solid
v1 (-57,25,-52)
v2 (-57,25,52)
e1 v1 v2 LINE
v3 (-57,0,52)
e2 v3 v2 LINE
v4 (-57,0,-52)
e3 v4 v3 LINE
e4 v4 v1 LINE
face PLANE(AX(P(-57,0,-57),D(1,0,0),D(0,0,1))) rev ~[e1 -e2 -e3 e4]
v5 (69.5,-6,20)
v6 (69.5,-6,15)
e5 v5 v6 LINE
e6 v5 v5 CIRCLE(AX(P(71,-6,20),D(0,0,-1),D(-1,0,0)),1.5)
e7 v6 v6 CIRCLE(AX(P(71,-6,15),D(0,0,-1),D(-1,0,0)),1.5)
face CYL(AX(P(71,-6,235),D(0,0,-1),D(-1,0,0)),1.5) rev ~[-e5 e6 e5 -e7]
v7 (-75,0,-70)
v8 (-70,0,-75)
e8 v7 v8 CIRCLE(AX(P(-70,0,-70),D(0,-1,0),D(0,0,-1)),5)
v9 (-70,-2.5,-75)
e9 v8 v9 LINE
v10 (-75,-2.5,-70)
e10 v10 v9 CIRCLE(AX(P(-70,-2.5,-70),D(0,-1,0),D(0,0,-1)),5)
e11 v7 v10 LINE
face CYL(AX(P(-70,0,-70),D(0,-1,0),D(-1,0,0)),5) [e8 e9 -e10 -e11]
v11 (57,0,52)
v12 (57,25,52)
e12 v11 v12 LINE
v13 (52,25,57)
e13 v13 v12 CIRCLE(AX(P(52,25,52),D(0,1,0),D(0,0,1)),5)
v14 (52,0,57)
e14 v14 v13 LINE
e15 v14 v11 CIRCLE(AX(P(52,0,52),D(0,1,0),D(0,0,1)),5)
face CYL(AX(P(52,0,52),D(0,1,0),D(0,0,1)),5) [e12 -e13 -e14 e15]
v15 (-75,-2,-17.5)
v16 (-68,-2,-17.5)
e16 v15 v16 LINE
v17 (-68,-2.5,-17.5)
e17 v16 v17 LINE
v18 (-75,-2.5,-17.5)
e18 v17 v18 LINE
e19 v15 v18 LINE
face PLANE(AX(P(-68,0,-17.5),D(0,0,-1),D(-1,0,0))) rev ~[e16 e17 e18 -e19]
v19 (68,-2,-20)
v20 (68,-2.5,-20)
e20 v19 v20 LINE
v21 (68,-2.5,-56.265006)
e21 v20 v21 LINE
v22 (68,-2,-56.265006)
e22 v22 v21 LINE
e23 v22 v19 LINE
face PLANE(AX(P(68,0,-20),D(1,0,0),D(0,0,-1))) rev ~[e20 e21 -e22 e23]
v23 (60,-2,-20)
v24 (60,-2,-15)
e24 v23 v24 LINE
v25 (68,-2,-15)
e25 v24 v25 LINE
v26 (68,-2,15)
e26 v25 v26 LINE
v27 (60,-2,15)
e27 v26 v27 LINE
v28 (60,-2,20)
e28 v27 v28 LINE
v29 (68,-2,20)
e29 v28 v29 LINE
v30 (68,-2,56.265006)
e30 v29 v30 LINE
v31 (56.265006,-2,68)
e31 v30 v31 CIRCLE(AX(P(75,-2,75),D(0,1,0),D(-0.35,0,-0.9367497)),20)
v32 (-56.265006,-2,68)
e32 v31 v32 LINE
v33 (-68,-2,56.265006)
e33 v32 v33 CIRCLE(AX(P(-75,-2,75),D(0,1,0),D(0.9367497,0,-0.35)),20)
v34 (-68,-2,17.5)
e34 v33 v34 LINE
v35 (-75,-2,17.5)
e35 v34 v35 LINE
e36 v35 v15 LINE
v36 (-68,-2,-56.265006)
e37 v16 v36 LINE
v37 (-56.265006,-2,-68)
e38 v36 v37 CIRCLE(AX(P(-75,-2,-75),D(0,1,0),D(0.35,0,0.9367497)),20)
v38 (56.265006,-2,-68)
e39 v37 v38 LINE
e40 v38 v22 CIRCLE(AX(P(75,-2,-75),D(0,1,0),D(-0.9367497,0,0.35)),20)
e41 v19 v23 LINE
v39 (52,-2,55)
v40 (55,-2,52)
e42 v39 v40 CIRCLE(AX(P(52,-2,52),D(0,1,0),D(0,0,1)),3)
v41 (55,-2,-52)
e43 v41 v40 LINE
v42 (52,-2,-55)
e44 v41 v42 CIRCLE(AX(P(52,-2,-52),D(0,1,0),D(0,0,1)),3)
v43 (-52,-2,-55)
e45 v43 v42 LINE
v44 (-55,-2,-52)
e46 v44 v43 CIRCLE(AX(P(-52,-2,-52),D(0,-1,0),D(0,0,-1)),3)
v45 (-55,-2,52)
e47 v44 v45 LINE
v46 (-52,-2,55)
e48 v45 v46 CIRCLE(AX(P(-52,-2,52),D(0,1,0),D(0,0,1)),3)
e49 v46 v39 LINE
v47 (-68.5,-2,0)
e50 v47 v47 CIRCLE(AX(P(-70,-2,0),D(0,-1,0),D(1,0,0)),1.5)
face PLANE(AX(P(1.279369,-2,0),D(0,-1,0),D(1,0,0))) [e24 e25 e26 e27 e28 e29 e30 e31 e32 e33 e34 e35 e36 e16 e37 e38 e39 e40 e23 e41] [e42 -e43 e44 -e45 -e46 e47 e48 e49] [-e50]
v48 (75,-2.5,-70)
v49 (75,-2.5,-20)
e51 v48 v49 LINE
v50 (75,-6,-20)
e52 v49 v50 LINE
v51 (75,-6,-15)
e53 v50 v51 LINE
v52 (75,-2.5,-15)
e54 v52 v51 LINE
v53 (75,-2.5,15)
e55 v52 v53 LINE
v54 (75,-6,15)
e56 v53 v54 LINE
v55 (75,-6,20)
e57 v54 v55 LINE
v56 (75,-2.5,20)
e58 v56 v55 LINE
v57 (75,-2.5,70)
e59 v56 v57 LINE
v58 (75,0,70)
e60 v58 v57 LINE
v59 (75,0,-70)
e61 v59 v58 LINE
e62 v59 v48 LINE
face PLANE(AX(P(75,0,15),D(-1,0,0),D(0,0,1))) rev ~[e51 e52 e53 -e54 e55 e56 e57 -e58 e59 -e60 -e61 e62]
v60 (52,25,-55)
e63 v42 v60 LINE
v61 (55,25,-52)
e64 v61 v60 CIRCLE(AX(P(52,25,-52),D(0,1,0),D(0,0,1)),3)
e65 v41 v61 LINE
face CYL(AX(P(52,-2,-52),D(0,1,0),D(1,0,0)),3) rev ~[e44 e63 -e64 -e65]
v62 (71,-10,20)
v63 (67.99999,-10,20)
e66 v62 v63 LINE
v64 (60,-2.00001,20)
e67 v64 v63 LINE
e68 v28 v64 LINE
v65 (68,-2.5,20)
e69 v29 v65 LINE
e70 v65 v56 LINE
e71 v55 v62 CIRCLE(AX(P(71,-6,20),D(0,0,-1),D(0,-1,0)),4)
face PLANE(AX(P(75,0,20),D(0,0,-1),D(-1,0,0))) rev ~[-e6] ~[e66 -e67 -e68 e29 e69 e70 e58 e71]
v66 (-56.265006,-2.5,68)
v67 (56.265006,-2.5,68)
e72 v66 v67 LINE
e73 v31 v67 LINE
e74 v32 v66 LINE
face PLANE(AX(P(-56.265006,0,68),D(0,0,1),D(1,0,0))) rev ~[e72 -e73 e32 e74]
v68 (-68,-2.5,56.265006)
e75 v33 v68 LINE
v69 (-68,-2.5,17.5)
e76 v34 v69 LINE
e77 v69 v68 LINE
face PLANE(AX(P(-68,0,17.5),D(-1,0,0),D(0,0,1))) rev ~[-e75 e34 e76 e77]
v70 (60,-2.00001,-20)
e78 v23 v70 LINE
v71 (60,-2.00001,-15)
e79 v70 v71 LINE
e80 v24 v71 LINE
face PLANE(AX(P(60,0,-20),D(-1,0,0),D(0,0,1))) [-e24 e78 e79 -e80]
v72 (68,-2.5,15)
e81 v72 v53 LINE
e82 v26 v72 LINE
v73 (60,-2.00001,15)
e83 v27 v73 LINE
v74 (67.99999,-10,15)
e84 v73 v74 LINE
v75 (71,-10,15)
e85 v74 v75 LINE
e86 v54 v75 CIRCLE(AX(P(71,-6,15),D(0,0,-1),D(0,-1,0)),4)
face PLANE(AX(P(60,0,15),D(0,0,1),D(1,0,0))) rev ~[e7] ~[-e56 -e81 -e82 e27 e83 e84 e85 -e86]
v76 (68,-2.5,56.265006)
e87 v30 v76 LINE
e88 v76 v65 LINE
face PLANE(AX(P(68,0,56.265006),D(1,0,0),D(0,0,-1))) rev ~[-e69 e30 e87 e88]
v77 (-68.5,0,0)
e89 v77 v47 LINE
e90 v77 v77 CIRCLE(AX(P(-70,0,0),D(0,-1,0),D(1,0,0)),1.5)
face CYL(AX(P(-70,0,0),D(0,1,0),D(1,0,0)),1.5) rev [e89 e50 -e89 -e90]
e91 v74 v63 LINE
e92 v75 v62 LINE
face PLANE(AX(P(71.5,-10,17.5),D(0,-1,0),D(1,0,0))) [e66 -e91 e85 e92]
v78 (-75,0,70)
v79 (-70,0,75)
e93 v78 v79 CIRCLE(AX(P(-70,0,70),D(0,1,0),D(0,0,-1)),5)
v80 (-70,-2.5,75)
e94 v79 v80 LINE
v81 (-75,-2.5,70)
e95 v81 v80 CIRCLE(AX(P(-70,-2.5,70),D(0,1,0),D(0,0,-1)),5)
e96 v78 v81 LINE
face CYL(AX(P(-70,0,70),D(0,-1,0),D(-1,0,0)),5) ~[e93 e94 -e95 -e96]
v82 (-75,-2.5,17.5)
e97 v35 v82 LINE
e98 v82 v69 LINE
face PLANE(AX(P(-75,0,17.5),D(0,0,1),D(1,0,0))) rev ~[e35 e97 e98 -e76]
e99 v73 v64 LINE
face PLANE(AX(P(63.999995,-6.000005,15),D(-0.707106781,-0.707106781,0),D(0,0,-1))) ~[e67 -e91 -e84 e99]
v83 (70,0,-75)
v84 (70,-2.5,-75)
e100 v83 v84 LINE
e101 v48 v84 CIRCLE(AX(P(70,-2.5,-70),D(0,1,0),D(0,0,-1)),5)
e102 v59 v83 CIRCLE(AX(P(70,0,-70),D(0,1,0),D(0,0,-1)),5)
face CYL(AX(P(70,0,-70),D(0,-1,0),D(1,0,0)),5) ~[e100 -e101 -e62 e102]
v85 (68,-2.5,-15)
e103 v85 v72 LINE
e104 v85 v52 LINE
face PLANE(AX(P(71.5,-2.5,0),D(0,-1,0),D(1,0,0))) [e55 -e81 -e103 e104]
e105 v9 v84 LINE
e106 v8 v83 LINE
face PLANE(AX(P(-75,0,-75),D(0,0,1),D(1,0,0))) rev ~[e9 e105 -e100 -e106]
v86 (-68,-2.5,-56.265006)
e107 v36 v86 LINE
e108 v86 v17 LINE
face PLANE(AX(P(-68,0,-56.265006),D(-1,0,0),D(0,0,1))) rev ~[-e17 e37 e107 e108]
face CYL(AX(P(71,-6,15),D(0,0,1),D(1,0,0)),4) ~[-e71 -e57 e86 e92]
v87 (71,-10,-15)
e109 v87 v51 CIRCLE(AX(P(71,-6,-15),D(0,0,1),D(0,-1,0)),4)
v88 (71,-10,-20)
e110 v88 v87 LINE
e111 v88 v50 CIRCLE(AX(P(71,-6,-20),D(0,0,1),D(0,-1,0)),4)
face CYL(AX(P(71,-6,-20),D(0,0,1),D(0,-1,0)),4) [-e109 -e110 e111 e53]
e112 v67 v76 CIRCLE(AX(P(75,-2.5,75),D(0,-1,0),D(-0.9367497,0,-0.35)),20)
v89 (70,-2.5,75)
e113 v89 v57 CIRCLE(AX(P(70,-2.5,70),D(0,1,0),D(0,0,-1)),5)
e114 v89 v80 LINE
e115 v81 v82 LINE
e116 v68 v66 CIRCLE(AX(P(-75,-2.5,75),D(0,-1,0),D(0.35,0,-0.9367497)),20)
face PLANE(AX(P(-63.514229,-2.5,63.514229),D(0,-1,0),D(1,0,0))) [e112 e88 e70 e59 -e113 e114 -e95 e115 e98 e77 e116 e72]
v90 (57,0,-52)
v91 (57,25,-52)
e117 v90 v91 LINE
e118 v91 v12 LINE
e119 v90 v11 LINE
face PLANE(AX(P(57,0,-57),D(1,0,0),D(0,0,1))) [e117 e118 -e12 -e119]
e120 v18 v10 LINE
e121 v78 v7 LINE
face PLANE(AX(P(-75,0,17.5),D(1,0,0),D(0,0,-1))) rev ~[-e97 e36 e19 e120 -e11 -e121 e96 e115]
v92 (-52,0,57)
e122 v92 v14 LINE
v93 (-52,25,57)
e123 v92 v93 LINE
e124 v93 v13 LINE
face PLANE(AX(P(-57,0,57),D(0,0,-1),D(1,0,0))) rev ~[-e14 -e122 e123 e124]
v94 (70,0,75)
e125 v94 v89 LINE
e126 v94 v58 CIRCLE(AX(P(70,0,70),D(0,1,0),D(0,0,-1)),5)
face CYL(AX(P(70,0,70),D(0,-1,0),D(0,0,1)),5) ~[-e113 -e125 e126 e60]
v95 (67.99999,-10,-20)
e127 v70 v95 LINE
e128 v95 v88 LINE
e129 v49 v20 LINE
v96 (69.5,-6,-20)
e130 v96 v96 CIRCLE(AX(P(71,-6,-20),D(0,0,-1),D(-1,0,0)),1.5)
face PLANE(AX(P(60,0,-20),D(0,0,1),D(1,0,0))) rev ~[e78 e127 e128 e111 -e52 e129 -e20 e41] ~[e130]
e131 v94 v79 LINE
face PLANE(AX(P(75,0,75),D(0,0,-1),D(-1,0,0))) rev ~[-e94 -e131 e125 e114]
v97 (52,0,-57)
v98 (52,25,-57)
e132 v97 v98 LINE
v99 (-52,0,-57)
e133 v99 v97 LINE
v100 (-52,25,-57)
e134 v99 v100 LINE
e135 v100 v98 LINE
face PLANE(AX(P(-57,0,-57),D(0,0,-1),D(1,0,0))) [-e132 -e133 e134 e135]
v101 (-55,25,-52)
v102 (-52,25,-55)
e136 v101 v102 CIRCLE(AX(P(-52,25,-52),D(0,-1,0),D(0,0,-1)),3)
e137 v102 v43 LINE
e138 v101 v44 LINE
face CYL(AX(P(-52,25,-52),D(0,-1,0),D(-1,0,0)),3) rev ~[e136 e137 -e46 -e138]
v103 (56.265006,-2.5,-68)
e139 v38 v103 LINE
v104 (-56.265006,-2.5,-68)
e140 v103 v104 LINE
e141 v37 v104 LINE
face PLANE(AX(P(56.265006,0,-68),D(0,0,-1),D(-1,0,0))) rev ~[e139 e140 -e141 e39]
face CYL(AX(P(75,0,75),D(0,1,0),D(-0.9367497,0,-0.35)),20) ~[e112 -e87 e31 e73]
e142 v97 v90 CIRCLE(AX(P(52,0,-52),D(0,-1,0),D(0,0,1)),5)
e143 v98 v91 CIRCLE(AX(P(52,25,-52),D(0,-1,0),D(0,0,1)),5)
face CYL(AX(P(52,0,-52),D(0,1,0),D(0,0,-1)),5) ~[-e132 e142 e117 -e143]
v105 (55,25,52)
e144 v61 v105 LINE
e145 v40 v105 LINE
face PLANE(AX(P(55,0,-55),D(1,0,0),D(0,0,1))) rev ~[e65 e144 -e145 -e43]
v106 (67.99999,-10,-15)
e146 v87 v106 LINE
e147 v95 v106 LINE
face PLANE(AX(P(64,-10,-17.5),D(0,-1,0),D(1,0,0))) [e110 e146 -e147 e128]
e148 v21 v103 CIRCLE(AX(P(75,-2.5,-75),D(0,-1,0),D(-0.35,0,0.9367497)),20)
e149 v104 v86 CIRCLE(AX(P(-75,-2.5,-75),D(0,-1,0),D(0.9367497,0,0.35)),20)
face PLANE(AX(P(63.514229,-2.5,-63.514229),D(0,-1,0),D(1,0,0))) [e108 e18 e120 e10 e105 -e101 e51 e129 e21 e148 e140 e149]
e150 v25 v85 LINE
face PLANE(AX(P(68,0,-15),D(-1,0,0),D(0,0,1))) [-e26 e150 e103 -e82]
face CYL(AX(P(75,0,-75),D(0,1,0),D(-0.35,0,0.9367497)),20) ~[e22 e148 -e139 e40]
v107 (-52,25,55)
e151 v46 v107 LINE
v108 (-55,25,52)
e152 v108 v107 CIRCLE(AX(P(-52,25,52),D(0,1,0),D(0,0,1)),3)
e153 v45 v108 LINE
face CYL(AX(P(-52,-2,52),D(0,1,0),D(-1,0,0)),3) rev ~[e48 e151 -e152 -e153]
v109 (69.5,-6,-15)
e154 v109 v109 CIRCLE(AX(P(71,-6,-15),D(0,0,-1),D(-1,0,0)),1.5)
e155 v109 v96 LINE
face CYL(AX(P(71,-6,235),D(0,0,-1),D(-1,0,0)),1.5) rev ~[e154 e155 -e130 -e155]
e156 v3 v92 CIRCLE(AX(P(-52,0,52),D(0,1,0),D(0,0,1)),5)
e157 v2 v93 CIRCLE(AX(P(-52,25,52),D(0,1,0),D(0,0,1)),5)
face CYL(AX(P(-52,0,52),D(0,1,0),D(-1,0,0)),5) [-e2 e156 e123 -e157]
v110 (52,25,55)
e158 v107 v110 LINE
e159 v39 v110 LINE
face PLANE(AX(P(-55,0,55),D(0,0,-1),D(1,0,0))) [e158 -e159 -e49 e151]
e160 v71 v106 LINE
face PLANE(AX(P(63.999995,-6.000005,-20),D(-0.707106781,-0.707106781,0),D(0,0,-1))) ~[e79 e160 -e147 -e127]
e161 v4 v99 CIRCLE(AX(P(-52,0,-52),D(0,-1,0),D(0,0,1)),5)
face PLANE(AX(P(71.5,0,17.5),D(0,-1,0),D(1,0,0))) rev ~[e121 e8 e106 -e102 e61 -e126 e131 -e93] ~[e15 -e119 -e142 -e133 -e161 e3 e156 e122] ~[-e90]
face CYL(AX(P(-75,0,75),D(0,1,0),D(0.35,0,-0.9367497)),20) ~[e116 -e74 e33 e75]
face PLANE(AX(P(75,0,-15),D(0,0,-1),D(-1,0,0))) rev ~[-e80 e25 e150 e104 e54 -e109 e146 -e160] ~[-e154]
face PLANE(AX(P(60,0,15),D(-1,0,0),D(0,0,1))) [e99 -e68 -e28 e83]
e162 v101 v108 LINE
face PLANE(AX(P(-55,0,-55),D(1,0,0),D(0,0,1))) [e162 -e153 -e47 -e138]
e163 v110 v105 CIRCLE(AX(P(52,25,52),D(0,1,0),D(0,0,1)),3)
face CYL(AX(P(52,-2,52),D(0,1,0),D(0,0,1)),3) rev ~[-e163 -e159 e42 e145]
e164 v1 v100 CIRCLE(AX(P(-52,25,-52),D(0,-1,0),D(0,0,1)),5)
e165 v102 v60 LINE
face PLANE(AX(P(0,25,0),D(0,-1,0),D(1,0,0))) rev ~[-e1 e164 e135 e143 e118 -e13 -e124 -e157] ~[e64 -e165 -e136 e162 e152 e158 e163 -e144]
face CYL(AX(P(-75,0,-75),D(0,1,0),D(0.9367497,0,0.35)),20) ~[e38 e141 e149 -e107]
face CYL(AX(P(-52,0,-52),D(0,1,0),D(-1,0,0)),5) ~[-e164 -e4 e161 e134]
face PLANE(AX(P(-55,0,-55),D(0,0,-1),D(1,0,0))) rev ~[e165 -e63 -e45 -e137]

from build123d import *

# Parameters (mm, degrees)
F0_R     = 1.5
F0_W     = 114
F0_H     = 114
F0_W_2   = 110
F0_H_2   = 110
F1_DEPTH = 2
F0_W_3   = 7
F0_H_3   = 30
F2_DEPTH = 2.5
F0_H_4   = 5
F0_W_4   = 8
F3_DEPTH = 10
F4_SIZE  = 7.99999
F5_R     = 4
F6_DEPTH = 25
F7_R     = 3
F8_R     = 5
F10_D    = 3


# Not quite as in the source:
# - a fillet or chamfer is up to 0.001 mm smaller than in the source, because OpenCascade refuses the exact size


with BuildPart() as f1:
    # F0 (on Front) → F1 (new body)
    with BuildSketch(Plane.XZ):
        with BuildLine():
            Line((-68, 17.5), (-75, 17.5))
            Line((-75, 17.5), (-75, -17.5))
            Line((-75, -17.5), (-68, -17.5))
            Line((-68, -17.5), (-68, -56.2650060048))
            ThreePointArc((-68, -56.2650060048), (-60.8578643763, -60.8578643763), (-56.2650060048, -68))
            Line((-56.2650060048, -68), (56.2650060048, -68))
            ThreePointArc((56.2650060048, -68), (60.8578643763, -60.8578643763), (68, -56.2650060048))
            Line((68, -56.2650060048), (68, -20))
            Line((68, -20), (60, -20))
            Line((60, -20), (60, -15))
            Line((60, -15), (68, -15))
            Line((68, -15), (68, 15))
            Line((68, 15), (60, 15))
            Line((60, 15), (60, 20))
            Line((60, 20), (68, 20))
            Line((68, 20), (68, 56.2650060048))
            ThreePointArc((68, 56.2650060048), (60.8578643763, 60.8578643763), (56.2650060048, 68))
            Line((56.2650060048, 68), (-56.2650060048, 68))
            ThreePointArc((-56.2650060048, 68), (-60.8578643763, 60.8578643763), (-68, 56.2650060048))
            Line((-68, 56.2650060048), (-68, 17.5))
        make_face()
        with Locations((-70, 0)):
            Circle(F0_R, mode=Mode.SUBTRACT)
        Rectangle(F0_W, F0_H, mode=Mode.SUBTRACT)
        Rectangle(F0_W, F0_H)
        Rectangle(F0_W_2, F0_H_2, mode=Mode.SUBTRACT)
    extrude(amount=F1_DEPTH)

    # F0 (on Front) → F2 (join)
    with BuildSketch(Plane.XZ):
        with BuildLine():
            Line((-68, 68), (-68, 56.2650060048))
            ThreePointArc((-68, 56.2650060048), (-60.8578643763, 60.8578643763), (-56.2650060048, 68))
            Line((-56.2650060048, 68), (-68, 68))
        make_face()
        Polygon((75, 20), (75, 75), (-75, 75), (-75, 17.5), (-68, 17.5), (-68, 56.2650060048), (-68, 68), (-56.2650060048, 68), (56.2650060048, 68), (68, 68), (68, 56.2650060048), (68, 20), align=None)
        with BuildLine():
            ThreePointArc((56.2650060048, 68), (60.8578643763, 60.8578643763), (68, 56.2650060048))
            Line((68, 56.2650060048), (68, 68))
            Line((68, 68), (56.2650060048, 68))
        make_face()
        with BuildLine():
            Line((68, -68), (68, -56.2650060048))
            ThreePointArc((68, -56.2650060048), (60.8578643763, -60.8578643763), (56.2650060048, -68))
            Line((56.2650060048, -68), (68, -68))
        make_face()
        with BuildLine():
            ThreePointArc((-56.2650060048, -68), (-60.8578643763, -60.8578643763), (-68, -56.2650060048))
            Line((-68, -56.2650060048), (-68, -68))
            Line((-68, -68), (-56.2650060048, -68))
        make_face()
        Polygon((-68, -17.5), (-75, -17.5), (-75, -75), (75, -75), (75, -20), (68, -20), (68, -56.2650060048), (68, -68), (56.2650060048, -68), (-56.2650060048, -68), (-68, -68), (-68, -56.2650060048), align=None)
        with Locations((71.5, 0)):
            Rectangle(F0_W_3, F0_H_3)
    extrude(amount=F2_DEPTH)

    # F0 (on Front) → F3 (join)
    with BuildSketch(Plane.XZ):
        with Locations((71.5, 17.5)):
            Rectangle(F0_W_3, F0_H_4)
        with Locations((64, 17.5)):
            Rectangle(F0_W_4, F0_H_4)
        with Locations((64, -17.5)):
            Rectangle(F0_W_4, F0_H_4)
        with Locations((71.5, -17.5)):
            Rectangle(F0_W_3, F0_H_4)
    extrude(amount=F3_DEPTH)

    # F4 (size 8 in the source; OpenCascade refuses exactly that, so slightly less here)
    f4_edges = [f1.edges().sort_by_distance(p)[0] for p in [
        (60, -10, 17.5),
        (60, -10, -17.5),
    ]]
    chamfer(f4_edges, length=F4_SIZE)

    # F5
    f5_edges = [f1.edges().sort_by_distance(p)[0] for p in [
        (75, -10, 17.5),
        (75, -10, -17.5),
    ]]
    fillet(f5_edges, radius=F5_R)

    # F0 (on Front) → F6 (join)
    with BuildSketch(Plane.XZ):
        Rectangle(F0_W, F0_H)
        Rectangle(F0_W_2, F0_H_2, mode=Mode.SUBTRACT)
    extrude(amount=-F6_DEPTH)

    # F7
    f7_edges = [f1.edges().sort_by_distance(p)[0] for p in [
        (-55, 11.5, 55),
        (55, 11.5, 55),
        (55, 11.5, -55),
        (-55, 11.5, -55),
    ]]
    fillet(f7_edges, radius=F7_R)

    # F8
    f8_edges = [f1.edges().sort_by_distance(p)[0] for p in [
        (57, 12.5, 57),
        (57, 12.5, -57),
        (-57, 12.5, -57),
        (-57, 12.5, 57),
        (-75, -1.25, 75),
        (-75, -1.25, -75),
        (75, -1.25, -75),
        (75, -1.25, 75),
    ]]
    fillet(f8_edges, radius=F8_R)

    # F10 (through all)
    with Locations(Plane.XY.offset(20)):
        with Locations((71, -6)):
            Hole(F10_D / 2)


solid = f1.part
